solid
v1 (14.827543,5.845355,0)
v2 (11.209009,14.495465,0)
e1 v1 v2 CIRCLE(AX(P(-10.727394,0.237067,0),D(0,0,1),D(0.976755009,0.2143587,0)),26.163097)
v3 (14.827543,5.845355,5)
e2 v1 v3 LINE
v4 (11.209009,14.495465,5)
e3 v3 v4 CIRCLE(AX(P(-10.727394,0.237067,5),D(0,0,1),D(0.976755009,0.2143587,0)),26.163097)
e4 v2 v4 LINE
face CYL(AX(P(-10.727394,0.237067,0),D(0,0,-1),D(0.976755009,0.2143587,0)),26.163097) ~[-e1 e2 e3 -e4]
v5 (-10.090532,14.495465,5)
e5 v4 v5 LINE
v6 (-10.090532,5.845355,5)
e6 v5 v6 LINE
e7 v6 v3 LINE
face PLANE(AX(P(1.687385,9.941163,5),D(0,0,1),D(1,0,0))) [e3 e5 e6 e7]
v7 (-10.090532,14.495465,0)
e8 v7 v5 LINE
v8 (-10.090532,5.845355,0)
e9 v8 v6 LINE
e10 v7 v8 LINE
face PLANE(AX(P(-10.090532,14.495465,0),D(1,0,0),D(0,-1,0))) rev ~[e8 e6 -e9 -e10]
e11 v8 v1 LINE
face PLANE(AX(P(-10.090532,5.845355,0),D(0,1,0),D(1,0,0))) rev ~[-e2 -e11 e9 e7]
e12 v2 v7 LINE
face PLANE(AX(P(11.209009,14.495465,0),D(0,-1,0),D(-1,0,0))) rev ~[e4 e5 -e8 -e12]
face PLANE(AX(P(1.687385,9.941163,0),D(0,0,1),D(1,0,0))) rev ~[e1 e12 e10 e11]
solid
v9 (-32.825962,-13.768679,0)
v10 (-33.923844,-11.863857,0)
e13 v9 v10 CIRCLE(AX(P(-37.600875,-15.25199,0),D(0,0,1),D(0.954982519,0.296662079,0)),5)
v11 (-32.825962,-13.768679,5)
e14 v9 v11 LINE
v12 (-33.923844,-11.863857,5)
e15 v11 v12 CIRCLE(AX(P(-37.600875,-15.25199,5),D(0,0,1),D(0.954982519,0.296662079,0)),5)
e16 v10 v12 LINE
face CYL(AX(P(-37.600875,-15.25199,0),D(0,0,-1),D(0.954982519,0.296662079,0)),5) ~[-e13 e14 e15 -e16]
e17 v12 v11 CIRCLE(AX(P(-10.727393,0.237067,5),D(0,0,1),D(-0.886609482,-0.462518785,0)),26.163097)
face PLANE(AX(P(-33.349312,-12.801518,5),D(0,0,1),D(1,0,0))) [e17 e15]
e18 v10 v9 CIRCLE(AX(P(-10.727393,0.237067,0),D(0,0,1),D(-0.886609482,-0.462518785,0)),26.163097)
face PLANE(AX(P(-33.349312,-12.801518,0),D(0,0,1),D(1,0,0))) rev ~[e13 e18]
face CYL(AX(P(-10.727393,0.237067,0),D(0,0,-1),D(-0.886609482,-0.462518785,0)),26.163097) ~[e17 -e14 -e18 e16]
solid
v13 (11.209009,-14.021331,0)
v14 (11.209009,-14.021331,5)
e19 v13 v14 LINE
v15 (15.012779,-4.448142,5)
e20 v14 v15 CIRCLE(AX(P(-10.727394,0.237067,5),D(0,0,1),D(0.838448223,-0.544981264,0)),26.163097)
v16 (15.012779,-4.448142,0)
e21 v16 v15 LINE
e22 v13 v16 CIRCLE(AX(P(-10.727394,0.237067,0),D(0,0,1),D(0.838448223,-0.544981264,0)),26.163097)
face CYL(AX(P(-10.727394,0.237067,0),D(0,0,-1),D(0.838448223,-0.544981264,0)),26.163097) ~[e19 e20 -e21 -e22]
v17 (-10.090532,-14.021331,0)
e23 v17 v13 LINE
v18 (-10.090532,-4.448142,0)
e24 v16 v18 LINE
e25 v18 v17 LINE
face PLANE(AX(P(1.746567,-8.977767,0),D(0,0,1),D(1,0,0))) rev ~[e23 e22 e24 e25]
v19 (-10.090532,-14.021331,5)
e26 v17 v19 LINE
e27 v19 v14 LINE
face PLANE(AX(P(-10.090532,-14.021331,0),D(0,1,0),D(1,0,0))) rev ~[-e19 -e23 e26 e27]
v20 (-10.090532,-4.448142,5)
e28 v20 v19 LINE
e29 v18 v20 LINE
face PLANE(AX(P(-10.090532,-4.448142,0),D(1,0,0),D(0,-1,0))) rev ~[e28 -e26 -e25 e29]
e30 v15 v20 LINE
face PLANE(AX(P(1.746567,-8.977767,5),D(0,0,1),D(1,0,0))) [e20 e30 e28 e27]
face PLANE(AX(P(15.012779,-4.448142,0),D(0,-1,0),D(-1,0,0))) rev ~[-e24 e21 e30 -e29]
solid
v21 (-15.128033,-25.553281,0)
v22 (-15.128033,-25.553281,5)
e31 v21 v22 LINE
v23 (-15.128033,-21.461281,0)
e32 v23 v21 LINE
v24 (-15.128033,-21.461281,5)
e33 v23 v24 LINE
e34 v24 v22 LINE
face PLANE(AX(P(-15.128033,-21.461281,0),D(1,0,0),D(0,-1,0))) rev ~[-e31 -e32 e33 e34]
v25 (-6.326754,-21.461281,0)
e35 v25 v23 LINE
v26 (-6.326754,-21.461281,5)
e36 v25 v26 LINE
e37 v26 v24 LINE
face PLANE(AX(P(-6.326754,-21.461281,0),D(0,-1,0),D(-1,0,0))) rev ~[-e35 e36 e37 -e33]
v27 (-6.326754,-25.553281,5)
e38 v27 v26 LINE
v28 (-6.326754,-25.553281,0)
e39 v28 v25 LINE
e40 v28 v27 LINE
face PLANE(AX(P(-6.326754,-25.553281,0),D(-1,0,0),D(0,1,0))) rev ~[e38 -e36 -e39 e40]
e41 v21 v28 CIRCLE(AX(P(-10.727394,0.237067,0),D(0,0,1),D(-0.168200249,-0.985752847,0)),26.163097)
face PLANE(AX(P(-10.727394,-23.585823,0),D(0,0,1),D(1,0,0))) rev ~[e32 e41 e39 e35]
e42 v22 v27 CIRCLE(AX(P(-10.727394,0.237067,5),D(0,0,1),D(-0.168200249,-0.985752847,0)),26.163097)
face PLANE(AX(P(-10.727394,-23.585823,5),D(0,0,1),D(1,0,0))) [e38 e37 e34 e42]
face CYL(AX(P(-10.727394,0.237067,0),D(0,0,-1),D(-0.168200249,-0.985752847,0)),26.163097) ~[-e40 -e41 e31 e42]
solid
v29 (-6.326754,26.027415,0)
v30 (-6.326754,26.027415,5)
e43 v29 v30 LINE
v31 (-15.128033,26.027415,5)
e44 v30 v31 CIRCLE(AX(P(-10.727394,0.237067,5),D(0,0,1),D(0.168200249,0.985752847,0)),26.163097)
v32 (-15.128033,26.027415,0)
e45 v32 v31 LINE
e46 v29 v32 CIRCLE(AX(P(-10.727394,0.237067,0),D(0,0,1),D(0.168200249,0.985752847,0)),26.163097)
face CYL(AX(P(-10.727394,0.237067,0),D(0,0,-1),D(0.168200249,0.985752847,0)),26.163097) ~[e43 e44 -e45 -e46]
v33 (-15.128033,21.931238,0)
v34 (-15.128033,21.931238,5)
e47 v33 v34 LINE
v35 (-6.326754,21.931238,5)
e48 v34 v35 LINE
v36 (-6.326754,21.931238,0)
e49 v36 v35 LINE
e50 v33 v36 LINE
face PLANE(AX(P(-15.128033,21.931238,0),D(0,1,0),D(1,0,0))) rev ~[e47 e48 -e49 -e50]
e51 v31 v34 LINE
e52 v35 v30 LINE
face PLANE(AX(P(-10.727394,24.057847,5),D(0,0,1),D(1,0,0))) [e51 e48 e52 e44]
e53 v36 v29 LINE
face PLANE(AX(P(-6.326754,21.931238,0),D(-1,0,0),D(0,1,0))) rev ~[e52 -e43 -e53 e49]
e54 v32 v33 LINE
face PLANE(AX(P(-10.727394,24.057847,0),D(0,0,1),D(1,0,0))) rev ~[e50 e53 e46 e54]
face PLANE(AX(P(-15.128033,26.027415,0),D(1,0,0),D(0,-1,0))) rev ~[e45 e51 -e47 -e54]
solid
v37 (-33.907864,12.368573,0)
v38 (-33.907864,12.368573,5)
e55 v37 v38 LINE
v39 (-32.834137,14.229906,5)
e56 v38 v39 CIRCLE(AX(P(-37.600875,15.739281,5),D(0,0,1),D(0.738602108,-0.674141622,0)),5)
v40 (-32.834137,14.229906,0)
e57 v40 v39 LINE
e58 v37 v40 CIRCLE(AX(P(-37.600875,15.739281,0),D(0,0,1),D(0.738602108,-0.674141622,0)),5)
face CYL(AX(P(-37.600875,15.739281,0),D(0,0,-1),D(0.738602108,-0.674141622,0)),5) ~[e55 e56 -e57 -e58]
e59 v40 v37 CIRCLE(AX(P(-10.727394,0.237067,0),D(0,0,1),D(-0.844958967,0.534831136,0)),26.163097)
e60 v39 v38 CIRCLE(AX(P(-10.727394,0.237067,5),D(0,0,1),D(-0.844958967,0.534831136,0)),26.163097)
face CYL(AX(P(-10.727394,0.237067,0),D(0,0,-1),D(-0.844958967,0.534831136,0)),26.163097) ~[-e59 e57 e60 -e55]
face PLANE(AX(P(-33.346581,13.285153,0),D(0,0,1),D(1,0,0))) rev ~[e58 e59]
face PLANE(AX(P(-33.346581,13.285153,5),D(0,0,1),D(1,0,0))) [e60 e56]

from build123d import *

# Parameters (mm, degrees)
F1_DEPTH = 5


# Not quite as in the source:
# - a feature names something its author has since deleted; it is built from what else it names


with BuildPart() as f1:
    # F0 (on Top) → F1 (new body)
    with BuildSketch(Plane.XY):
        with BuildLine():
            Line((-10.0905321275, 5.8453546624), (14.8275429309, 5.8453546624))
            ThreePointArc((14.8275429309, 5.8453546624), (13.4089467522, 10.333836128), (11.2090090081, 14.4954650047))
            Line((11.2090090081, 14.4954650047), (-10.0905321275, 14.4954650047))
            Line((-10.0905321275, 14.4954650047), (-10.0905321275, 5.8453546624))
        make_face()
    extrude(amount=F1_DEPTH)


with BuildPart() as f1b:
    # F0 (on Top) → F1, piece 2 (new body)
    with BuildSketch(Plane.XY):
        with BuildLine():
            Line((-10.0905321275, -14.0213307756), (11.2090090081, -14.0213307756))
            ThreePointArc((11.2090090081, -14.0213307756), (13.5867060203, -9.4237936022), (15.0127789753, -4.4481421807))
            Line((15.0127789753, -4.4481421807), (-10.0905321275, -4.4481421807))
            Line((-10.0905321275, -4.4481421807), (-10.0905321275, -14.0213307756))
        make_face()
    extrude(amount=F1_DEPTH)


with BuildPart() as f1c:
    # F0 (on Top) → F1, piece 3 (new body)
    with BuildSketch(Plane.XY):
        with BuildLine():
            Line((-15.1280330338, -21.4612806617), (-15.1280330338, -25.5532806617))
            ThreePointArc((-15.1280330338, -25.5532806617), (-10.7273935254, -25.9260303035), (-6.326754017, -25.5532806617))
            Line((-6.326754017, -25.5532806617), (-6.326754017, -21.4612806617))
            Line((-6.326754017, -21.4612806617), (-15.1280330338, -21.4612806617))
        make_face()
    extrude(amount=F1_DEPTH)


with BuildPart() as f1d:
    # F0 (on Top) → F1, piece 4 (new body)
    with BuildSketch(Plane.XY):
        with BuildLine():
            ThreePointArc((-32.8259622054, -13.7686791634), (-33.2689093484, -12.7551765215), (-33.9238437811, -11.8638569014))
            ThreePointArc((-33.9238437811, -11.8638569014), (-33.3949203437, -12.8278054239), (-32.8259622054, -13.7686791634))
        make_face()
    extrude(amount=F1_DEPTH)


with BuildPart() as f1e:
    # F0 (on Top) → F1, piece 5 (new body)
    with BuildSketch(Plane.XY):
        with BuildLine():
            ThreePointArc((-33.907864258, 12.3685733327), (-33.2698270825, 13.2408768133), (-32.8341372879, 14.2299062378))
            ThreePointArc((-32.8341372879, 14.2299062378), (-33.3901181901, 13.3102678428), (-33.907864258, 12.3685733327))
        make_face()
    extrude(amount=F1_DEPTH)


with BuildPart() as f1f:
    # F0 (on Top) → F1, piece 6 (new body)
    with BuildSketch(Plane.XY):
        with BuildLine():
            Line((-6.326754017, 21.931238229), (-6.326754017, 26.0274148909))
            ThreePointArc((-6.326754017, 26.0274148909), (-10.7273935254, 26.4001645326), (-15.1280330338, 26.0274148909))
            Line((-15.1280330338, 26.0274148909), (-15.1280330338, 21.931238229))
            Line((-15.1280330338, 21.931238229), (-6.326754017, 21.931238229))
        make_face()
    extrude(amount=F1_DEPTH)


solid = Compound([f1.part, f1b.part, f1c.part, f1d.part, f1e.part, f1f.part])
